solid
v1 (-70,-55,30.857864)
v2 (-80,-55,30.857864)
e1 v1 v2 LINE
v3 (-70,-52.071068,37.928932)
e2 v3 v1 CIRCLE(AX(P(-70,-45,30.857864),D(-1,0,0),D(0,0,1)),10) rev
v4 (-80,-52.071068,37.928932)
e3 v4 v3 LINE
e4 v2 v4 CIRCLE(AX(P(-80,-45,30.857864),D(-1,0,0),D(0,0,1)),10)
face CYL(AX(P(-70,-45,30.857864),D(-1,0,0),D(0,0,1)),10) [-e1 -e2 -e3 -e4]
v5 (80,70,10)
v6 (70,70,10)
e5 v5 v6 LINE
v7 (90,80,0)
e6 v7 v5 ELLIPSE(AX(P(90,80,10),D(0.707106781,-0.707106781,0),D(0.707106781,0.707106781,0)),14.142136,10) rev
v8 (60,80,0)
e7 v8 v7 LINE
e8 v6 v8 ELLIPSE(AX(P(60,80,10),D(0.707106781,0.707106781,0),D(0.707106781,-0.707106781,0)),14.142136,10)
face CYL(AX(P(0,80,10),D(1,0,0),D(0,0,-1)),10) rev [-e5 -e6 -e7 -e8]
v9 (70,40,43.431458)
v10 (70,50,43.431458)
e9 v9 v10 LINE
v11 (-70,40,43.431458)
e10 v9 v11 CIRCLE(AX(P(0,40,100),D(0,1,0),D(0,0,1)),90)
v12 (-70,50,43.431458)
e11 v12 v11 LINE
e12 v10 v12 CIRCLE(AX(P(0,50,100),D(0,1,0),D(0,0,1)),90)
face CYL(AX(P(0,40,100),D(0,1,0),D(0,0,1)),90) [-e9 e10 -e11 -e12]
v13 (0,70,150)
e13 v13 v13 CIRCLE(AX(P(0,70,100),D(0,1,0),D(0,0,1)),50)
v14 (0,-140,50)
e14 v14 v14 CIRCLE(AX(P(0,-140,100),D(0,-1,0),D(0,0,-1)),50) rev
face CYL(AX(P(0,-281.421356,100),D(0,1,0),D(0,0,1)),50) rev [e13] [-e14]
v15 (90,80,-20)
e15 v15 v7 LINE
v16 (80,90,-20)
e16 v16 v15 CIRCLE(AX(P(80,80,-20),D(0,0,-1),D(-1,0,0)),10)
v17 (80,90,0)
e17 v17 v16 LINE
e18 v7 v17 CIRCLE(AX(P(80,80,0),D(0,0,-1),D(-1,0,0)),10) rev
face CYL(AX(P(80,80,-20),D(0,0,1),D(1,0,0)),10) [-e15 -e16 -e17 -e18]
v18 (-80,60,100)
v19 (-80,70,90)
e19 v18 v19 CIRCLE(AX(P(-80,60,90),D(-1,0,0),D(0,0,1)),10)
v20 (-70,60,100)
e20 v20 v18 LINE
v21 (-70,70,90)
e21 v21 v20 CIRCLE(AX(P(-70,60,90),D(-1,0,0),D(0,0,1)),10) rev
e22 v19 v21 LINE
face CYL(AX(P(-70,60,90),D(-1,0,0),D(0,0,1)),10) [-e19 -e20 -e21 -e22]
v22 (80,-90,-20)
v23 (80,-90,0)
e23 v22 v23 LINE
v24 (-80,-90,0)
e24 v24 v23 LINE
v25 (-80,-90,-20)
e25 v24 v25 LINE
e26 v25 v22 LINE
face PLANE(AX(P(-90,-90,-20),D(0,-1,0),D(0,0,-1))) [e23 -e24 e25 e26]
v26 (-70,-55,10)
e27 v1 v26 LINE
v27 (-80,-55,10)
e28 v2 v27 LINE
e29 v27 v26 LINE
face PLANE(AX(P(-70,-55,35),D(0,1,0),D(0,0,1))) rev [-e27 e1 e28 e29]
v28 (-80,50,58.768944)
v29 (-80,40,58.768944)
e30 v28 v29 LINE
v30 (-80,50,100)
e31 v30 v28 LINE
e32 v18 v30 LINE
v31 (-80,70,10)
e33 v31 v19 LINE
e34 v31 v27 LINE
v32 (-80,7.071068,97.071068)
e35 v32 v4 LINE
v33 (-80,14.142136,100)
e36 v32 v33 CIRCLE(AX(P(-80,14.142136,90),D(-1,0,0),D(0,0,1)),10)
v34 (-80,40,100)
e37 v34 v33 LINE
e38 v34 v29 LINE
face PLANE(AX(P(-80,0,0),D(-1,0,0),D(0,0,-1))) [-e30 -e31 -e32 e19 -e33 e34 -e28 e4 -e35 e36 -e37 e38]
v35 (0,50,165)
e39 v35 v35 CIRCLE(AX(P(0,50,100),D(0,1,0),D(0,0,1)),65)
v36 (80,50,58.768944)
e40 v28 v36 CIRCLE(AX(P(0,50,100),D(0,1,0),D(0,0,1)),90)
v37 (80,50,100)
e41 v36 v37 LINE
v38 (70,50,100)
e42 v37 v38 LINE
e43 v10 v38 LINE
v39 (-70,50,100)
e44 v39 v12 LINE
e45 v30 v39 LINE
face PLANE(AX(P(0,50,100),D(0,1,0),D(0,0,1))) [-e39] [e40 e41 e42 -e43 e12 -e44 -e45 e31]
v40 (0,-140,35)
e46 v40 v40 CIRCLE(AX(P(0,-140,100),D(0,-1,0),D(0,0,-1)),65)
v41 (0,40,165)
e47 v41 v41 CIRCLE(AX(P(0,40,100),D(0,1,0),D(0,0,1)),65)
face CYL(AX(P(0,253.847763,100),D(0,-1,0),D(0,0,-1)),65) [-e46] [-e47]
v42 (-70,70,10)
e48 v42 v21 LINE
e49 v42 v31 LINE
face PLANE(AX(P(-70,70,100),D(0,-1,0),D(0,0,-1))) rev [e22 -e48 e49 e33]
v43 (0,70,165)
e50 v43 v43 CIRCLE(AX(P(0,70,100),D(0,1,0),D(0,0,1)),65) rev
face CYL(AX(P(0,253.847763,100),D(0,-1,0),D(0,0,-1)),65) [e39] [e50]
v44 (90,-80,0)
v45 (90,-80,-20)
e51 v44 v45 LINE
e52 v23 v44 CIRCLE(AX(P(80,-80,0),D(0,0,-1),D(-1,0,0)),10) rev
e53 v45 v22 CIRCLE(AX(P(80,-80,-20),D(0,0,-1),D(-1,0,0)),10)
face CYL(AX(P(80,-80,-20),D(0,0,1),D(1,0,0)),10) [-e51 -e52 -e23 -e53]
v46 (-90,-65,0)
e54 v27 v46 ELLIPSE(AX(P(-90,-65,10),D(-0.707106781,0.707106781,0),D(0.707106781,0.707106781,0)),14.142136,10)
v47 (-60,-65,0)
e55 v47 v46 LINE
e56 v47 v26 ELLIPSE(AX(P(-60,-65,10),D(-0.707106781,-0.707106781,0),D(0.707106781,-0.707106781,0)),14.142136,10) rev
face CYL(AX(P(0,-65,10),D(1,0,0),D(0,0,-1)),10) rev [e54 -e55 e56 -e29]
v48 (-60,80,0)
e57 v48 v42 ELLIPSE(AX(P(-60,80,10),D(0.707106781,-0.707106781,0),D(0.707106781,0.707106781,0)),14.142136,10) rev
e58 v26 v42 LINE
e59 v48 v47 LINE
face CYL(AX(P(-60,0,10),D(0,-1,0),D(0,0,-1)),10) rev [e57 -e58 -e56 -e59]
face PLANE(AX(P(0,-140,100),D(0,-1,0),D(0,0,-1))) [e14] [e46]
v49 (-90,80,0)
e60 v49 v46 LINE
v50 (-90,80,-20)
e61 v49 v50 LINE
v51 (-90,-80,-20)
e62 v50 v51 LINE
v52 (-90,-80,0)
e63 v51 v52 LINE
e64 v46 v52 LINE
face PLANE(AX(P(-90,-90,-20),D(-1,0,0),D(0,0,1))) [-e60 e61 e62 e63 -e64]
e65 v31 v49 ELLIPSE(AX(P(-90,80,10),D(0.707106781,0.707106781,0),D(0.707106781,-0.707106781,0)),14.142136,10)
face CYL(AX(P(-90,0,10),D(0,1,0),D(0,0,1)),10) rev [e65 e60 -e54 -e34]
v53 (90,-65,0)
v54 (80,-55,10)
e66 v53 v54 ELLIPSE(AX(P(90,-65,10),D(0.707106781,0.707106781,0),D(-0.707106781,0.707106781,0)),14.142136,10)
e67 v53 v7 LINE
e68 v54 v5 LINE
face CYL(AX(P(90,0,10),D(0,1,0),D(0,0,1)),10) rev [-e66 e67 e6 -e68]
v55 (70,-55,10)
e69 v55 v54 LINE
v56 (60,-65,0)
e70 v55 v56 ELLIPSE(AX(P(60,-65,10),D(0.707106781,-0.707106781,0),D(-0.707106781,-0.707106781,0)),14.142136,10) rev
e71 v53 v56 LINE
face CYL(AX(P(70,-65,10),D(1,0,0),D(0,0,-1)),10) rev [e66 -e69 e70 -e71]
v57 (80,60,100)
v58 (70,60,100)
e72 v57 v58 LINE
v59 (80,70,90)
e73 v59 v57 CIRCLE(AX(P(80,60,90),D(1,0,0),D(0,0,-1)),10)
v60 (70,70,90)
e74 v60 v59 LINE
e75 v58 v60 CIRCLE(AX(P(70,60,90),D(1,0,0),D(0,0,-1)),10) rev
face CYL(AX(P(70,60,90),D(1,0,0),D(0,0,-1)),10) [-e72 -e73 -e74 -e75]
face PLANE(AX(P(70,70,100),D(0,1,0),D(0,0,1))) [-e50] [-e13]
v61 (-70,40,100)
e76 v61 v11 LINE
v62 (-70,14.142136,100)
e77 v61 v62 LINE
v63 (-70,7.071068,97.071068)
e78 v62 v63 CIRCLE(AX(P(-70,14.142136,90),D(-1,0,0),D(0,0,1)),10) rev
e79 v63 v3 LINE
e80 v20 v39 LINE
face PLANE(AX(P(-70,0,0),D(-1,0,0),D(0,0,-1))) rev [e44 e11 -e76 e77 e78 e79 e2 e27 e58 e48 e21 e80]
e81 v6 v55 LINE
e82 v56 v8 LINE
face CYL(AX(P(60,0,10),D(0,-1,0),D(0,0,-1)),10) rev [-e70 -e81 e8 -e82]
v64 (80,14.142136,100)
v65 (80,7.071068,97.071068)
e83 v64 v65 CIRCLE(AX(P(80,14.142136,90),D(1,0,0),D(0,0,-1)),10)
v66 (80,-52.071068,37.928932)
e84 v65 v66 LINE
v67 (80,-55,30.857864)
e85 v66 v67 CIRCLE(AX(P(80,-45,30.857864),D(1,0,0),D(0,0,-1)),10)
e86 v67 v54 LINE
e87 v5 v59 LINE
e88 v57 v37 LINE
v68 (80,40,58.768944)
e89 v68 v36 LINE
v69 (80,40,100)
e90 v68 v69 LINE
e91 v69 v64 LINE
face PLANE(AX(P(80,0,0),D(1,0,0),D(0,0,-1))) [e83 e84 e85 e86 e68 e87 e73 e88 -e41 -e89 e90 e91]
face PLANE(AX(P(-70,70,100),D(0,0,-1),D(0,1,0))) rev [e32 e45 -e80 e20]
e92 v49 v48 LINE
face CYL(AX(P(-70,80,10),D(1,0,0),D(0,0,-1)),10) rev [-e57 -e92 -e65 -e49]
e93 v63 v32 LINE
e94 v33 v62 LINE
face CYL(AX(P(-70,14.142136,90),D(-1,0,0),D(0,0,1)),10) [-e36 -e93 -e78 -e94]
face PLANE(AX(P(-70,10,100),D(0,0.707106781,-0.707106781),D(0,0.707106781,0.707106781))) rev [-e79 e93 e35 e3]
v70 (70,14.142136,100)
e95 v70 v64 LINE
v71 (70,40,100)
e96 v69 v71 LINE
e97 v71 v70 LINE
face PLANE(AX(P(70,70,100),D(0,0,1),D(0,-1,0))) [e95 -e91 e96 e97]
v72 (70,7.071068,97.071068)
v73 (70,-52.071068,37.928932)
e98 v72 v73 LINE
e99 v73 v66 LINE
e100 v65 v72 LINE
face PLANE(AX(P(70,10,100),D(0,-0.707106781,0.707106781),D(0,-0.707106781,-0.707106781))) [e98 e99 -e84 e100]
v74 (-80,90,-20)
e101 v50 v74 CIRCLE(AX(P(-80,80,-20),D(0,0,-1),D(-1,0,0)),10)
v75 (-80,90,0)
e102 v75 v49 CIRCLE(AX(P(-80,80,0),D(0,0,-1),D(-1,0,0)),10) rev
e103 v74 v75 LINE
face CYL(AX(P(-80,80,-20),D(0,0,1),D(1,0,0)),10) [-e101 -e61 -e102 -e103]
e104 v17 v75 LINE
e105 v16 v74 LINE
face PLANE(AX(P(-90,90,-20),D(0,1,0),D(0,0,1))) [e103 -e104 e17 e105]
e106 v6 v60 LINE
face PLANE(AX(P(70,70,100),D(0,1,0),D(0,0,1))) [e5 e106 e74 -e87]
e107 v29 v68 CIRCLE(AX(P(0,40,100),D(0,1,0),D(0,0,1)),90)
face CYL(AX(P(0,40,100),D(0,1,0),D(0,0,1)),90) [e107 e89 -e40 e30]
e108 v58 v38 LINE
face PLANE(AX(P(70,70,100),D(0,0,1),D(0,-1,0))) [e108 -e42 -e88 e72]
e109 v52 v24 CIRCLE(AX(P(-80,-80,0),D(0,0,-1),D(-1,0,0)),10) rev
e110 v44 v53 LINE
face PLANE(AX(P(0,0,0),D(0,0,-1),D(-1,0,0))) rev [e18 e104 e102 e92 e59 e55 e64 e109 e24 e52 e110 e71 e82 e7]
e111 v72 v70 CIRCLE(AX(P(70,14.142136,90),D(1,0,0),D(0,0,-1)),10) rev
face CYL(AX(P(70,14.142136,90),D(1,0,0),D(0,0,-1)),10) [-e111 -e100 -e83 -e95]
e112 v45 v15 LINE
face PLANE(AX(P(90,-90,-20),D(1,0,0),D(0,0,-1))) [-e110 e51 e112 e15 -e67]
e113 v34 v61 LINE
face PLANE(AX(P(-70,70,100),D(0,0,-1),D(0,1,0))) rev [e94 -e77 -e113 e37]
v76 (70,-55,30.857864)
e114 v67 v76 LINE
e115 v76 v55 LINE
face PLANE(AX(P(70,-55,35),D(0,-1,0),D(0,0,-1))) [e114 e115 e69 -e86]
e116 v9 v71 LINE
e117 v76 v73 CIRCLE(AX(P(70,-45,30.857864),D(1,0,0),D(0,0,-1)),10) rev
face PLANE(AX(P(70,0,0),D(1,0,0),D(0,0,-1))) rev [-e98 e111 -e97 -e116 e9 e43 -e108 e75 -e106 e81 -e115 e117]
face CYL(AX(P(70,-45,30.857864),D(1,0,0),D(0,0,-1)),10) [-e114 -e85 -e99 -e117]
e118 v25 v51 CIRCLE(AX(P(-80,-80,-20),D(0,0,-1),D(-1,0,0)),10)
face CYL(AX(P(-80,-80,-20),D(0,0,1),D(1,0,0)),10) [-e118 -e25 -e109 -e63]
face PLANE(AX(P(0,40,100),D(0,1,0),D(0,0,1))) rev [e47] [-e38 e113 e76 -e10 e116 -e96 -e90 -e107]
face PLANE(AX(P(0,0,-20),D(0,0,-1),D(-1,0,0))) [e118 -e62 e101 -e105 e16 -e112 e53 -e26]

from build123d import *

# Parameters (mm, degrees)
BASE_SKETCH_W                   = 180
BASE_SKETCH_H                   = 180
BASE_EXTRUDE_DEPTH              = 20
SUPPORT_EXTRUDE_DEPTH           = 10
MOTOR_SUPPORT_SKETCH_R          = 90
MOTOR_SUPPORT_EXTRUDE_DEPTH     = 10
MOTOR_SKETCH_R                  = 65
MOTOR_EXTRUDE_DEPTH             = 180
MOTOR_EXTRUDE_DIRECTION_2_REACH = 249.184
MOTOR_HOLE_SKETCH_R             = 50
MOTOR_HOLE_CUT_DEPTH            = 210
SUPPORT_FILLETS_R               = 10


with BuildPart() as part:
    # Base Sketch → Base Extrude (new body)
    with BuildSketch(Plane.XY):
        Rectangle(BASE_SKETCH_W, BASE_SKETCH_H)
    extrude(amount=-BASE_EXTRUDE_DEPTH)

    # Support Sketch → Support Extrude (add)
    with BuildSketch(Plane(origin=(80, 0, 0), x_dir=(0, 0, -1), z_dir=(1, 0, 0))):
        Polygon((-100, 10), (-35, -55), (0, -55), (0, 70), (-100, 70), align=None)
    support_extrude = extrude(amount=-SUPPORT_EXTRUDE_DEPTH)

    # Support Mirror: Support Extrude across plane
    add(support_extrude.mirror(Plane(origin=(0, 0, 0), x_dir=(0, 0, 1), z_dir=(1, 0, 0))))

    # Motor Support Sketch → Motor Support Extrude (add)
    with BuildSketch(Plane(origin=(0, 50, 0), x_dir=(1, 0, 0), z_dir=(0, 1, 0))):
        with Locations((0, -100)):
            Circle(MOTOR_SUPPORT_SKETCH_R)
    extrude(amount=-MOTOR_SUPPORT_EXTRUDE_DEPTH)

    # Motor Sketch → Motor Extrude (add)
    with BuildSketch(Plane.XZ.offset(-40)):
        with Locations(Location((0, 100, 0), (0, 0, 90))):
            Circle(MOTOR_SKETCH_R)
    extrude(amount=MOTOR_EXTRUDE_DEPTH)

    # Motor Extrude direction 2: up to this face of the body (flat: up to its plane)
    motor_extrude_direction_2_end = Plane(part.part.faces().sort_by_distance((75, 70, 50))[0])
    # Motor Sketch → Motor Extrude direction 2 (add, up to the picked face)
    with BuildSketch(Plane.XZ.offset(-40), mode=Mode.PRIVATE) as motor_extrude_direction_2_sk1:
        with Locations(Location((0, 100, 0), (0, 0, 90))):
            Circle(MOTOR_SKETCH_R)
    motor_extrude_direction_2_tool1 = split(extrude(motor_extrude_direction_2_sk1.sketch, amount=-MOTOR_EXTRUDE_DIRECTION_2_REACH, mode=Mode.PRIVATE), bisect_by=motor_extrude_direction_2_end, keep=Keep.BOTH, mode=Mode.PRIVATE)
    add(motor_extrude_direction_2_tool1.solids().sort_by(Axis((0, 40, 100), (0, 1, 0)))[0])

    # Motor Hole Sketch → Motor Hole Cut (cut)
    with BuildSketch(Plane(origin=(0, 70, 0), x_dir=(1, 0, 0), z_dir=(0, 1, 0))):
        with Locations(Location((0, -100, 0), (0, 0, 270))):
            Circle(MOTOR_HOLE_SKETCH_R)
    extrude(amount=-MOTOR_HOLE_CUT_DEPTH, mode=Mode.SUBTRACT)

    # Support Fillets
    support_fillets_edges = [part.edges().sort_by_distance(p)[0] for p in [
        (75, 10, 100),
        (75, 70, 100),
        (70, 7.5, 0),
        (75, 70, 0),
        (75, -55, 0),
        (75, -55, 35),
        (80, 7.5, 0),
        (-75, 70, 100),
        (-75, 10, 100),
        (-75, -55, 35),
        (-80, 7.5, 0),
        (-75, -55, 0),
        (-75, 70, 0),
        (-70, 7.5, 0),
        (90, -90, -10),
        (-90, -90, -10),
        (-90, 90, -10),
        (90, 90, -10),
    ]]
    fillet(support_fillets_edges, radius=SUPPORT_FILLETS_R - 0.0001)  # a hair under: the kernel refuses the full size


solid = part.part
